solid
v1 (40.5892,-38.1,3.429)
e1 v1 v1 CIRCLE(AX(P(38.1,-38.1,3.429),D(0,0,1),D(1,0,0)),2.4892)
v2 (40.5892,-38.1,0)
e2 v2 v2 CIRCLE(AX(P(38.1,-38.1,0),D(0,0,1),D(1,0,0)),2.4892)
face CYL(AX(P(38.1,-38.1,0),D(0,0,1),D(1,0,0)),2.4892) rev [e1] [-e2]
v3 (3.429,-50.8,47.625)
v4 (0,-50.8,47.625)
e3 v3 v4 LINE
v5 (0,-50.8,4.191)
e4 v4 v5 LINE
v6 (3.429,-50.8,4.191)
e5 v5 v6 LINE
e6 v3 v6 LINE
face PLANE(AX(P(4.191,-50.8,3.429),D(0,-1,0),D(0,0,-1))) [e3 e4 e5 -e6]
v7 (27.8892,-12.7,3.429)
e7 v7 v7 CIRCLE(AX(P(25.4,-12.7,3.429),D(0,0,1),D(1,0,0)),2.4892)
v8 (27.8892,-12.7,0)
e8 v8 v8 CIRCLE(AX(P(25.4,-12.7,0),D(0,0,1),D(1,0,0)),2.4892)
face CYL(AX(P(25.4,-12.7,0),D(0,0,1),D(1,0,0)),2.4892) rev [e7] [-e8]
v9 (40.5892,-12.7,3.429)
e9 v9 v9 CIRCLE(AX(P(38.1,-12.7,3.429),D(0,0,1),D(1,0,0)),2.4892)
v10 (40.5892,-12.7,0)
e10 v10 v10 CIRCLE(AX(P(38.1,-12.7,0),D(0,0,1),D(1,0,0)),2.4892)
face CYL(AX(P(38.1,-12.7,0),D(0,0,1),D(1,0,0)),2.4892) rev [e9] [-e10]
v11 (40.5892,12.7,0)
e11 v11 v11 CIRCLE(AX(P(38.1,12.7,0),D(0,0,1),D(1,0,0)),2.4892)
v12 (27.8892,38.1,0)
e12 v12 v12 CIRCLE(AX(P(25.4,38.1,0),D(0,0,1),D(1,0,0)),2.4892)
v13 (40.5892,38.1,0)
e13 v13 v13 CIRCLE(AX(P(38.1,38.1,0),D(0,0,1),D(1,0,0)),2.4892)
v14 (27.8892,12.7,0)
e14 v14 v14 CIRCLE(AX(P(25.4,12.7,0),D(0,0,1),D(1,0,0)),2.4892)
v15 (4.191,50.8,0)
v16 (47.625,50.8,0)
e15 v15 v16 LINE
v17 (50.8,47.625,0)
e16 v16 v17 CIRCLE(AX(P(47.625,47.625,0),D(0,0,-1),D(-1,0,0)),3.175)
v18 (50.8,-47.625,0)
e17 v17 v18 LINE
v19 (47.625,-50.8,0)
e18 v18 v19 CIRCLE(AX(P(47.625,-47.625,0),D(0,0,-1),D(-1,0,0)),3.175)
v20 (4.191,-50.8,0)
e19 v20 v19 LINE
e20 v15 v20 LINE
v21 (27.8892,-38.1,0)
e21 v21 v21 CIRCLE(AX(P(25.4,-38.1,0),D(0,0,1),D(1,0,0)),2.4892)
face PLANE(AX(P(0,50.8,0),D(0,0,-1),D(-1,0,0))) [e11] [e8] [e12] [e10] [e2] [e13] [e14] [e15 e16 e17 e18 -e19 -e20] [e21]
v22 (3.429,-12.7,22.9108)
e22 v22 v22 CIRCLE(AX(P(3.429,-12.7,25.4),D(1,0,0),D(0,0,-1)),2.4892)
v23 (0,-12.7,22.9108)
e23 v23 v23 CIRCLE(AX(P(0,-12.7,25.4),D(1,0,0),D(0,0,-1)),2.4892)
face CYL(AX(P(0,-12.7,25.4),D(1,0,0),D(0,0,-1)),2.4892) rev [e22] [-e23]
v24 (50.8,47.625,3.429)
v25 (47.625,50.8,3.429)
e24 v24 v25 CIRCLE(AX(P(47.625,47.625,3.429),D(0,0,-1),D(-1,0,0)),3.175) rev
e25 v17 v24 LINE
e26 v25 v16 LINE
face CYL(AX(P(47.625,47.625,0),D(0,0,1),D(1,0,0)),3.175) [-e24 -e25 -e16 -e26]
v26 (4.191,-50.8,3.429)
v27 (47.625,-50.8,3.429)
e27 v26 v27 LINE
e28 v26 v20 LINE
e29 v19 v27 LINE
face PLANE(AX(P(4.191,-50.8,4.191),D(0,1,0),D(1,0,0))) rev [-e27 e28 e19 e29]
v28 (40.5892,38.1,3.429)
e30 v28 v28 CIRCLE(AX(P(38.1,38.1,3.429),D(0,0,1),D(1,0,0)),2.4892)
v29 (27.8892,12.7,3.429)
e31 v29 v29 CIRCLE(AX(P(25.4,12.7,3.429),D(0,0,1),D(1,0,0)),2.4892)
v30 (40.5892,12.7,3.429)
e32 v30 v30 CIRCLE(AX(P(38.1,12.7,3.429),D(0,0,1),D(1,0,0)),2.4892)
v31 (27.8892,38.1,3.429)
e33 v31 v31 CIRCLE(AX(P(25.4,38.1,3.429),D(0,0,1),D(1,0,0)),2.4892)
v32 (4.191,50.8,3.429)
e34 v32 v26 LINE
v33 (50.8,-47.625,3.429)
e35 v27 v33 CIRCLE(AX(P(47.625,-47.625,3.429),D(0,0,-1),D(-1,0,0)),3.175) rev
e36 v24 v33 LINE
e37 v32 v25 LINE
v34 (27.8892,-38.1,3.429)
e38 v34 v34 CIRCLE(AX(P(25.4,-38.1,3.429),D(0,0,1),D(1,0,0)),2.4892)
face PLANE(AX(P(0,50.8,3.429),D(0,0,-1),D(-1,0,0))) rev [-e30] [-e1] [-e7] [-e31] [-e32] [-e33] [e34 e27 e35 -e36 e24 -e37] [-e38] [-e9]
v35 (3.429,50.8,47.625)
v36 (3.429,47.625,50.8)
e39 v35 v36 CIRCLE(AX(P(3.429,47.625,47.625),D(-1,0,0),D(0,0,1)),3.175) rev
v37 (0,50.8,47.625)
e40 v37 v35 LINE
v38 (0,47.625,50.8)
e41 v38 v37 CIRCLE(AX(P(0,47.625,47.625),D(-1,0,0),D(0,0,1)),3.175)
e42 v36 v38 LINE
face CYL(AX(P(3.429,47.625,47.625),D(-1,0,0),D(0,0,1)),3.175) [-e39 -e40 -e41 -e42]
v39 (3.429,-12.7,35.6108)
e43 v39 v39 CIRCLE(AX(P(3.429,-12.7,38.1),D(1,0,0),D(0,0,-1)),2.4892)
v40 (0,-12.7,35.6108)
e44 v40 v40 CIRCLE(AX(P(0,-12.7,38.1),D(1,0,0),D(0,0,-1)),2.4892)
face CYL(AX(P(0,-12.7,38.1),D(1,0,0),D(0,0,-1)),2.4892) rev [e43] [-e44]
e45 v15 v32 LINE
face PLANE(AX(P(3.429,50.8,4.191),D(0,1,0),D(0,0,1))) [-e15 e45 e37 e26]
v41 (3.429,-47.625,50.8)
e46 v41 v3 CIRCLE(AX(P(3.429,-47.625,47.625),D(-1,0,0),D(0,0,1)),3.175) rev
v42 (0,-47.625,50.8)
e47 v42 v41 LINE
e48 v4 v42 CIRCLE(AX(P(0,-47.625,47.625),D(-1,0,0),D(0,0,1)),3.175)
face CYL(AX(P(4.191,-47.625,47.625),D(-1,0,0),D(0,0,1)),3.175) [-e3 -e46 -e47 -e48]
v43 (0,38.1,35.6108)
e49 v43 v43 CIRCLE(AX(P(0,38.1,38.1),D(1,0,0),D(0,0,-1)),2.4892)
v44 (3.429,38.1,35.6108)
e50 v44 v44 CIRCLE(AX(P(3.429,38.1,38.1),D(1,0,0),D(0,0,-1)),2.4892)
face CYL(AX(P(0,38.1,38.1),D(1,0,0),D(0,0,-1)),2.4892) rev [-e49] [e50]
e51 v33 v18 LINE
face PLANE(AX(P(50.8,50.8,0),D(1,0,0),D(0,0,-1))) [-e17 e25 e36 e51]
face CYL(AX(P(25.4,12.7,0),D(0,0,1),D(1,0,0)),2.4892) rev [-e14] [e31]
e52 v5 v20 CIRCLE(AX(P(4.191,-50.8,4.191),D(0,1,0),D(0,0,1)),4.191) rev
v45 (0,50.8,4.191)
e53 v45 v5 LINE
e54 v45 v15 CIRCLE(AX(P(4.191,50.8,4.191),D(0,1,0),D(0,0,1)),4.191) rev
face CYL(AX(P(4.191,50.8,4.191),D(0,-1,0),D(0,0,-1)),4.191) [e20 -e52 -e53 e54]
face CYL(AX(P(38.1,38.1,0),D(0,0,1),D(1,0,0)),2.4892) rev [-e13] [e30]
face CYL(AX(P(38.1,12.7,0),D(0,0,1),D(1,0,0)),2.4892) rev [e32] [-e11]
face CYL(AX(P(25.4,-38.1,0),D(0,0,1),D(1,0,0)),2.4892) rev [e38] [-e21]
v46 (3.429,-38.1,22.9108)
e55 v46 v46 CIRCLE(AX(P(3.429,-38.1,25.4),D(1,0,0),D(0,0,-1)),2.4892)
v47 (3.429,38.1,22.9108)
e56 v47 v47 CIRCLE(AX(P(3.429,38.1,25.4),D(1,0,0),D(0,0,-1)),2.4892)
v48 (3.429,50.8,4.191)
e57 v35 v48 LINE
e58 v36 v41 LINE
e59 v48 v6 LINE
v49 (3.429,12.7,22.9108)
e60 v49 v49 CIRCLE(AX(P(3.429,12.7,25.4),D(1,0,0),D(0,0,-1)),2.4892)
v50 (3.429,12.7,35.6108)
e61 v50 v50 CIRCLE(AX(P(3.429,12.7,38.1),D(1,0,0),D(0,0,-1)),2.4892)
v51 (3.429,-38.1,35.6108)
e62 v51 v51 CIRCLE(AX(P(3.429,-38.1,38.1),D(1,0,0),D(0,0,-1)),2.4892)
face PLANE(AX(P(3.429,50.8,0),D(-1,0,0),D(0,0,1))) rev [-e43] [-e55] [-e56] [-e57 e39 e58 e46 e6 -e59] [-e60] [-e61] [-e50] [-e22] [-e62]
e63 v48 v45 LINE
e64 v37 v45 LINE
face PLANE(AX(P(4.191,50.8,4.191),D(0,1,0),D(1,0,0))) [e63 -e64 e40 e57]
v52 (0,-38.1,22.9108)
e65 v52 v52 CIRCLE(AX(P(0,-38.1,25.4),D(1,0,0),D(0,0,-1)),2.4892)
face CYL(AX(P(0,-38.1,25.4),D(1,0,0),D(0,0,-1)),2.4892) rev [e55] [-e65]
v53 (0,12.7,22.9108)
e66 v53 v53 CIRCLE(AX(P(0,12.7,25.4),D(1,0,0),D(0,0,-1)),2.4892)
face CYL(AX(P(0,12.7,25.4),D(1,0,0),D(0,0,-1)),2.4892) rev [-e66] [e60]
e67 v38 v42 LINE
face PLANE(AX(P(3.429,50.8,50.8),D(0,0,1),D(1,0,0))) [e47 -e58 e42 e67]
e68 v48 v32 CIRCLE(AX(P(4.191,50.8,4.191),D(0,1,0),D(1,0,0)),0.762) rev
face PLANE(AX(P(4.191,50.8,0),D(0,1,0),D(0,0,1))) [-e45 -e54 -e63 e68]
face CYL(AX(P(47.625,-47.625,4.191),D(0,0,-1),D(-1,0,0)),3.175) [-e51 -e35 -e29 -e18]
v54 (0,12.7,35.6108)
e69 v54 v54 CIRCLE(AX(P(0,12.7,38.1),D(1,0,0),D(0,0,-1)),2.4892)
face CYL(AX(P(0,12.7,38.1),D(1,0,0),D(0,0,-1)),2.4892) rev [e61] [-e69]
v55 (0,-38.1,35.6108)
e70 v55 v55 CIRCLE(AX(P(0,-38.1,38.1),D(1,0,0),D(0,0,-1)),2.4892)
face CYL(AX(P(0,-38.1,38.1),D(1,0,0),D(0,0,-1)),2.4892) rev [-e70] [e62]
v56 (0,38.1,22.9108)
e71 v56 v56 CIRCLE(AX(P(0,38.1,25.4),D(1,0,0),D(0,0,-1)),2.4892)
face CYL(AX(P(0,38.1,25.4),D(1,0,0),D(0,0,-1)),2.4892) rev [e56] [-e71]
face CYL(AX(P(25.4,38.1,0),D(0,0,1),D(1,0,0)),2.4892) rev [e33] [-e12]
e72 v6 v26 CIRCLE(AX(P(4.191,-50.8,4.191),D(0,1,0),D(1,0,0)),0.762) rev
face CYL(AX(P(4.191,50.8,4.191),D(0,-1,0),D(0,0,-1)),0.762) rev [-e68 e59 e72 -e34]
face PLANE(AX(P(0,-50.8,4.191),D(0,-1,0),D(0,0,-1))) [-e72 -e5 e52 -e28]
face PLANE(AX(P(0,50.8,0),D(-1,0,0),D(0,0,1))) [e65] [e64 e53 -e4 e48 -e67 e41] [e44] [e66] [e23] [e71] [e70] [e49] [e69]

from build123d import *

# Parameters (mm, degrees)
BASE_FLANGE1_DEPTH = 50.8
SKETCH6_R          = 2.4892
CUT_EXTRUDE1_DEPTH = 87.054004212
SKETCH7_R          = 2.4892
CUT_EXTRUDE2_DEPTH = 87.054004212
FILLET1_R          = 3.175


# Sheet-metal steps are written as plain solids
with BuildPart() as part:
    # Sketch1 → Base-Flange1 (new, symmetric)
    with BuildSketch(Plane(origin=(0, 0, 0), x_dir=(1, 0, 0), z_dir=(0, 1, 0))):
        with BuildLine():
            Line((50.8, 0), (4.191, 0))
            ThreePointArc((4.191, 0), (1.22751548, -1.22751548), (0, -4.191))
            Line((0, -4.191), (0, -50.8))
            Line((0, -50.8), (3.429, -50.8))
            Line((3.429, -50.8), (3.429, -4.191))
            ThreePointArc((3.429, -4.191), (3.652184633, -3.652184633), (4.191, -3.429))
            Line((4.191, -3.429), (50.8, -3.429))
            Line((50.8, -3.429), (50.8, 0))
        make_face()
    extrude(amount=BASE_FLANGE1_DEPTH, both=True)

    # Sketch6 → Cut-Extrude1 (cut, through all)
    with BuildSketch(Plane(origin=(3.429, 0, 0), x_dir=(0, 0, -1), z_dir=(1, 0, 0))):
        with Locations((-38.1, 38.1)):
            Circle(SKETCH6_R)
        with Locations((-25.4, 38.1)):
            Circle(SKETCH6_R)
        with Locations((-38.1, 12.7)):
            Circle(SKETCH6_R)
        with Locations((-25.4, 12.7)):
            Circle(SKETCH6_R)
        with Locations((-38.1, -12.7)):
            Circle(SKETCH6_R)
        with Locations((-25.4, -12.7)):
            Circle(SKETCH6_R)
        with Locations((-38.1, -38.1)):
            Circle(SKETCH6_R)
        with Locations((-25.4, -38.1)):
            Circle(SKETCH6_R)
    extrude(amount=-CUT_EXTRUDE1_DEPTH, mode=Mode.SUBTRACT)

    # Sketch7 → Cut-Extrude2 (cut, through all)
    with BuildSketch(Plane.XY.offset(3.429)):
        with Locations((25.4, 38.1)):
            Circle(SKETCH7_R)
        with Locations((38.1, 38.1)):
            Circle(SKETCH7_R)
        with Locations((25.4, 12.7)):
            Circle(SKETCH7_R)
        with Locations((38.1, 12.7)):
            Circle(SKETCH7_R)
        with Locations((25.4, -12.7)):
            Circle(SKETCH7_R)
        with Locations((38.1, -12.7)):
            Circle(SKETCH7_R)
        with Locations((25.4, -38.1)):
            Circle(SKETCH7_R)
        with Locations((38.1, -38.1)):
            Circle(SKETCH7_R)
    extrude(amount=-CUT_EXTRUDE2_DEPTH, mode=Mode.SUBTRACT)

    # Fillet1
    fillet1_edges = [part.edges().sort_by_distance(p)[0] for p in [
        (1.7145, 50.8, 50.8),
        (1.7145, -50.8, 50.8),
        (50.8, 50.8, 1.7145),
        (50.8, -50.8, 1.7145),
    ]]
    fillet(fillet1_edges, radius=FILLET1_R)


solid = part.part
